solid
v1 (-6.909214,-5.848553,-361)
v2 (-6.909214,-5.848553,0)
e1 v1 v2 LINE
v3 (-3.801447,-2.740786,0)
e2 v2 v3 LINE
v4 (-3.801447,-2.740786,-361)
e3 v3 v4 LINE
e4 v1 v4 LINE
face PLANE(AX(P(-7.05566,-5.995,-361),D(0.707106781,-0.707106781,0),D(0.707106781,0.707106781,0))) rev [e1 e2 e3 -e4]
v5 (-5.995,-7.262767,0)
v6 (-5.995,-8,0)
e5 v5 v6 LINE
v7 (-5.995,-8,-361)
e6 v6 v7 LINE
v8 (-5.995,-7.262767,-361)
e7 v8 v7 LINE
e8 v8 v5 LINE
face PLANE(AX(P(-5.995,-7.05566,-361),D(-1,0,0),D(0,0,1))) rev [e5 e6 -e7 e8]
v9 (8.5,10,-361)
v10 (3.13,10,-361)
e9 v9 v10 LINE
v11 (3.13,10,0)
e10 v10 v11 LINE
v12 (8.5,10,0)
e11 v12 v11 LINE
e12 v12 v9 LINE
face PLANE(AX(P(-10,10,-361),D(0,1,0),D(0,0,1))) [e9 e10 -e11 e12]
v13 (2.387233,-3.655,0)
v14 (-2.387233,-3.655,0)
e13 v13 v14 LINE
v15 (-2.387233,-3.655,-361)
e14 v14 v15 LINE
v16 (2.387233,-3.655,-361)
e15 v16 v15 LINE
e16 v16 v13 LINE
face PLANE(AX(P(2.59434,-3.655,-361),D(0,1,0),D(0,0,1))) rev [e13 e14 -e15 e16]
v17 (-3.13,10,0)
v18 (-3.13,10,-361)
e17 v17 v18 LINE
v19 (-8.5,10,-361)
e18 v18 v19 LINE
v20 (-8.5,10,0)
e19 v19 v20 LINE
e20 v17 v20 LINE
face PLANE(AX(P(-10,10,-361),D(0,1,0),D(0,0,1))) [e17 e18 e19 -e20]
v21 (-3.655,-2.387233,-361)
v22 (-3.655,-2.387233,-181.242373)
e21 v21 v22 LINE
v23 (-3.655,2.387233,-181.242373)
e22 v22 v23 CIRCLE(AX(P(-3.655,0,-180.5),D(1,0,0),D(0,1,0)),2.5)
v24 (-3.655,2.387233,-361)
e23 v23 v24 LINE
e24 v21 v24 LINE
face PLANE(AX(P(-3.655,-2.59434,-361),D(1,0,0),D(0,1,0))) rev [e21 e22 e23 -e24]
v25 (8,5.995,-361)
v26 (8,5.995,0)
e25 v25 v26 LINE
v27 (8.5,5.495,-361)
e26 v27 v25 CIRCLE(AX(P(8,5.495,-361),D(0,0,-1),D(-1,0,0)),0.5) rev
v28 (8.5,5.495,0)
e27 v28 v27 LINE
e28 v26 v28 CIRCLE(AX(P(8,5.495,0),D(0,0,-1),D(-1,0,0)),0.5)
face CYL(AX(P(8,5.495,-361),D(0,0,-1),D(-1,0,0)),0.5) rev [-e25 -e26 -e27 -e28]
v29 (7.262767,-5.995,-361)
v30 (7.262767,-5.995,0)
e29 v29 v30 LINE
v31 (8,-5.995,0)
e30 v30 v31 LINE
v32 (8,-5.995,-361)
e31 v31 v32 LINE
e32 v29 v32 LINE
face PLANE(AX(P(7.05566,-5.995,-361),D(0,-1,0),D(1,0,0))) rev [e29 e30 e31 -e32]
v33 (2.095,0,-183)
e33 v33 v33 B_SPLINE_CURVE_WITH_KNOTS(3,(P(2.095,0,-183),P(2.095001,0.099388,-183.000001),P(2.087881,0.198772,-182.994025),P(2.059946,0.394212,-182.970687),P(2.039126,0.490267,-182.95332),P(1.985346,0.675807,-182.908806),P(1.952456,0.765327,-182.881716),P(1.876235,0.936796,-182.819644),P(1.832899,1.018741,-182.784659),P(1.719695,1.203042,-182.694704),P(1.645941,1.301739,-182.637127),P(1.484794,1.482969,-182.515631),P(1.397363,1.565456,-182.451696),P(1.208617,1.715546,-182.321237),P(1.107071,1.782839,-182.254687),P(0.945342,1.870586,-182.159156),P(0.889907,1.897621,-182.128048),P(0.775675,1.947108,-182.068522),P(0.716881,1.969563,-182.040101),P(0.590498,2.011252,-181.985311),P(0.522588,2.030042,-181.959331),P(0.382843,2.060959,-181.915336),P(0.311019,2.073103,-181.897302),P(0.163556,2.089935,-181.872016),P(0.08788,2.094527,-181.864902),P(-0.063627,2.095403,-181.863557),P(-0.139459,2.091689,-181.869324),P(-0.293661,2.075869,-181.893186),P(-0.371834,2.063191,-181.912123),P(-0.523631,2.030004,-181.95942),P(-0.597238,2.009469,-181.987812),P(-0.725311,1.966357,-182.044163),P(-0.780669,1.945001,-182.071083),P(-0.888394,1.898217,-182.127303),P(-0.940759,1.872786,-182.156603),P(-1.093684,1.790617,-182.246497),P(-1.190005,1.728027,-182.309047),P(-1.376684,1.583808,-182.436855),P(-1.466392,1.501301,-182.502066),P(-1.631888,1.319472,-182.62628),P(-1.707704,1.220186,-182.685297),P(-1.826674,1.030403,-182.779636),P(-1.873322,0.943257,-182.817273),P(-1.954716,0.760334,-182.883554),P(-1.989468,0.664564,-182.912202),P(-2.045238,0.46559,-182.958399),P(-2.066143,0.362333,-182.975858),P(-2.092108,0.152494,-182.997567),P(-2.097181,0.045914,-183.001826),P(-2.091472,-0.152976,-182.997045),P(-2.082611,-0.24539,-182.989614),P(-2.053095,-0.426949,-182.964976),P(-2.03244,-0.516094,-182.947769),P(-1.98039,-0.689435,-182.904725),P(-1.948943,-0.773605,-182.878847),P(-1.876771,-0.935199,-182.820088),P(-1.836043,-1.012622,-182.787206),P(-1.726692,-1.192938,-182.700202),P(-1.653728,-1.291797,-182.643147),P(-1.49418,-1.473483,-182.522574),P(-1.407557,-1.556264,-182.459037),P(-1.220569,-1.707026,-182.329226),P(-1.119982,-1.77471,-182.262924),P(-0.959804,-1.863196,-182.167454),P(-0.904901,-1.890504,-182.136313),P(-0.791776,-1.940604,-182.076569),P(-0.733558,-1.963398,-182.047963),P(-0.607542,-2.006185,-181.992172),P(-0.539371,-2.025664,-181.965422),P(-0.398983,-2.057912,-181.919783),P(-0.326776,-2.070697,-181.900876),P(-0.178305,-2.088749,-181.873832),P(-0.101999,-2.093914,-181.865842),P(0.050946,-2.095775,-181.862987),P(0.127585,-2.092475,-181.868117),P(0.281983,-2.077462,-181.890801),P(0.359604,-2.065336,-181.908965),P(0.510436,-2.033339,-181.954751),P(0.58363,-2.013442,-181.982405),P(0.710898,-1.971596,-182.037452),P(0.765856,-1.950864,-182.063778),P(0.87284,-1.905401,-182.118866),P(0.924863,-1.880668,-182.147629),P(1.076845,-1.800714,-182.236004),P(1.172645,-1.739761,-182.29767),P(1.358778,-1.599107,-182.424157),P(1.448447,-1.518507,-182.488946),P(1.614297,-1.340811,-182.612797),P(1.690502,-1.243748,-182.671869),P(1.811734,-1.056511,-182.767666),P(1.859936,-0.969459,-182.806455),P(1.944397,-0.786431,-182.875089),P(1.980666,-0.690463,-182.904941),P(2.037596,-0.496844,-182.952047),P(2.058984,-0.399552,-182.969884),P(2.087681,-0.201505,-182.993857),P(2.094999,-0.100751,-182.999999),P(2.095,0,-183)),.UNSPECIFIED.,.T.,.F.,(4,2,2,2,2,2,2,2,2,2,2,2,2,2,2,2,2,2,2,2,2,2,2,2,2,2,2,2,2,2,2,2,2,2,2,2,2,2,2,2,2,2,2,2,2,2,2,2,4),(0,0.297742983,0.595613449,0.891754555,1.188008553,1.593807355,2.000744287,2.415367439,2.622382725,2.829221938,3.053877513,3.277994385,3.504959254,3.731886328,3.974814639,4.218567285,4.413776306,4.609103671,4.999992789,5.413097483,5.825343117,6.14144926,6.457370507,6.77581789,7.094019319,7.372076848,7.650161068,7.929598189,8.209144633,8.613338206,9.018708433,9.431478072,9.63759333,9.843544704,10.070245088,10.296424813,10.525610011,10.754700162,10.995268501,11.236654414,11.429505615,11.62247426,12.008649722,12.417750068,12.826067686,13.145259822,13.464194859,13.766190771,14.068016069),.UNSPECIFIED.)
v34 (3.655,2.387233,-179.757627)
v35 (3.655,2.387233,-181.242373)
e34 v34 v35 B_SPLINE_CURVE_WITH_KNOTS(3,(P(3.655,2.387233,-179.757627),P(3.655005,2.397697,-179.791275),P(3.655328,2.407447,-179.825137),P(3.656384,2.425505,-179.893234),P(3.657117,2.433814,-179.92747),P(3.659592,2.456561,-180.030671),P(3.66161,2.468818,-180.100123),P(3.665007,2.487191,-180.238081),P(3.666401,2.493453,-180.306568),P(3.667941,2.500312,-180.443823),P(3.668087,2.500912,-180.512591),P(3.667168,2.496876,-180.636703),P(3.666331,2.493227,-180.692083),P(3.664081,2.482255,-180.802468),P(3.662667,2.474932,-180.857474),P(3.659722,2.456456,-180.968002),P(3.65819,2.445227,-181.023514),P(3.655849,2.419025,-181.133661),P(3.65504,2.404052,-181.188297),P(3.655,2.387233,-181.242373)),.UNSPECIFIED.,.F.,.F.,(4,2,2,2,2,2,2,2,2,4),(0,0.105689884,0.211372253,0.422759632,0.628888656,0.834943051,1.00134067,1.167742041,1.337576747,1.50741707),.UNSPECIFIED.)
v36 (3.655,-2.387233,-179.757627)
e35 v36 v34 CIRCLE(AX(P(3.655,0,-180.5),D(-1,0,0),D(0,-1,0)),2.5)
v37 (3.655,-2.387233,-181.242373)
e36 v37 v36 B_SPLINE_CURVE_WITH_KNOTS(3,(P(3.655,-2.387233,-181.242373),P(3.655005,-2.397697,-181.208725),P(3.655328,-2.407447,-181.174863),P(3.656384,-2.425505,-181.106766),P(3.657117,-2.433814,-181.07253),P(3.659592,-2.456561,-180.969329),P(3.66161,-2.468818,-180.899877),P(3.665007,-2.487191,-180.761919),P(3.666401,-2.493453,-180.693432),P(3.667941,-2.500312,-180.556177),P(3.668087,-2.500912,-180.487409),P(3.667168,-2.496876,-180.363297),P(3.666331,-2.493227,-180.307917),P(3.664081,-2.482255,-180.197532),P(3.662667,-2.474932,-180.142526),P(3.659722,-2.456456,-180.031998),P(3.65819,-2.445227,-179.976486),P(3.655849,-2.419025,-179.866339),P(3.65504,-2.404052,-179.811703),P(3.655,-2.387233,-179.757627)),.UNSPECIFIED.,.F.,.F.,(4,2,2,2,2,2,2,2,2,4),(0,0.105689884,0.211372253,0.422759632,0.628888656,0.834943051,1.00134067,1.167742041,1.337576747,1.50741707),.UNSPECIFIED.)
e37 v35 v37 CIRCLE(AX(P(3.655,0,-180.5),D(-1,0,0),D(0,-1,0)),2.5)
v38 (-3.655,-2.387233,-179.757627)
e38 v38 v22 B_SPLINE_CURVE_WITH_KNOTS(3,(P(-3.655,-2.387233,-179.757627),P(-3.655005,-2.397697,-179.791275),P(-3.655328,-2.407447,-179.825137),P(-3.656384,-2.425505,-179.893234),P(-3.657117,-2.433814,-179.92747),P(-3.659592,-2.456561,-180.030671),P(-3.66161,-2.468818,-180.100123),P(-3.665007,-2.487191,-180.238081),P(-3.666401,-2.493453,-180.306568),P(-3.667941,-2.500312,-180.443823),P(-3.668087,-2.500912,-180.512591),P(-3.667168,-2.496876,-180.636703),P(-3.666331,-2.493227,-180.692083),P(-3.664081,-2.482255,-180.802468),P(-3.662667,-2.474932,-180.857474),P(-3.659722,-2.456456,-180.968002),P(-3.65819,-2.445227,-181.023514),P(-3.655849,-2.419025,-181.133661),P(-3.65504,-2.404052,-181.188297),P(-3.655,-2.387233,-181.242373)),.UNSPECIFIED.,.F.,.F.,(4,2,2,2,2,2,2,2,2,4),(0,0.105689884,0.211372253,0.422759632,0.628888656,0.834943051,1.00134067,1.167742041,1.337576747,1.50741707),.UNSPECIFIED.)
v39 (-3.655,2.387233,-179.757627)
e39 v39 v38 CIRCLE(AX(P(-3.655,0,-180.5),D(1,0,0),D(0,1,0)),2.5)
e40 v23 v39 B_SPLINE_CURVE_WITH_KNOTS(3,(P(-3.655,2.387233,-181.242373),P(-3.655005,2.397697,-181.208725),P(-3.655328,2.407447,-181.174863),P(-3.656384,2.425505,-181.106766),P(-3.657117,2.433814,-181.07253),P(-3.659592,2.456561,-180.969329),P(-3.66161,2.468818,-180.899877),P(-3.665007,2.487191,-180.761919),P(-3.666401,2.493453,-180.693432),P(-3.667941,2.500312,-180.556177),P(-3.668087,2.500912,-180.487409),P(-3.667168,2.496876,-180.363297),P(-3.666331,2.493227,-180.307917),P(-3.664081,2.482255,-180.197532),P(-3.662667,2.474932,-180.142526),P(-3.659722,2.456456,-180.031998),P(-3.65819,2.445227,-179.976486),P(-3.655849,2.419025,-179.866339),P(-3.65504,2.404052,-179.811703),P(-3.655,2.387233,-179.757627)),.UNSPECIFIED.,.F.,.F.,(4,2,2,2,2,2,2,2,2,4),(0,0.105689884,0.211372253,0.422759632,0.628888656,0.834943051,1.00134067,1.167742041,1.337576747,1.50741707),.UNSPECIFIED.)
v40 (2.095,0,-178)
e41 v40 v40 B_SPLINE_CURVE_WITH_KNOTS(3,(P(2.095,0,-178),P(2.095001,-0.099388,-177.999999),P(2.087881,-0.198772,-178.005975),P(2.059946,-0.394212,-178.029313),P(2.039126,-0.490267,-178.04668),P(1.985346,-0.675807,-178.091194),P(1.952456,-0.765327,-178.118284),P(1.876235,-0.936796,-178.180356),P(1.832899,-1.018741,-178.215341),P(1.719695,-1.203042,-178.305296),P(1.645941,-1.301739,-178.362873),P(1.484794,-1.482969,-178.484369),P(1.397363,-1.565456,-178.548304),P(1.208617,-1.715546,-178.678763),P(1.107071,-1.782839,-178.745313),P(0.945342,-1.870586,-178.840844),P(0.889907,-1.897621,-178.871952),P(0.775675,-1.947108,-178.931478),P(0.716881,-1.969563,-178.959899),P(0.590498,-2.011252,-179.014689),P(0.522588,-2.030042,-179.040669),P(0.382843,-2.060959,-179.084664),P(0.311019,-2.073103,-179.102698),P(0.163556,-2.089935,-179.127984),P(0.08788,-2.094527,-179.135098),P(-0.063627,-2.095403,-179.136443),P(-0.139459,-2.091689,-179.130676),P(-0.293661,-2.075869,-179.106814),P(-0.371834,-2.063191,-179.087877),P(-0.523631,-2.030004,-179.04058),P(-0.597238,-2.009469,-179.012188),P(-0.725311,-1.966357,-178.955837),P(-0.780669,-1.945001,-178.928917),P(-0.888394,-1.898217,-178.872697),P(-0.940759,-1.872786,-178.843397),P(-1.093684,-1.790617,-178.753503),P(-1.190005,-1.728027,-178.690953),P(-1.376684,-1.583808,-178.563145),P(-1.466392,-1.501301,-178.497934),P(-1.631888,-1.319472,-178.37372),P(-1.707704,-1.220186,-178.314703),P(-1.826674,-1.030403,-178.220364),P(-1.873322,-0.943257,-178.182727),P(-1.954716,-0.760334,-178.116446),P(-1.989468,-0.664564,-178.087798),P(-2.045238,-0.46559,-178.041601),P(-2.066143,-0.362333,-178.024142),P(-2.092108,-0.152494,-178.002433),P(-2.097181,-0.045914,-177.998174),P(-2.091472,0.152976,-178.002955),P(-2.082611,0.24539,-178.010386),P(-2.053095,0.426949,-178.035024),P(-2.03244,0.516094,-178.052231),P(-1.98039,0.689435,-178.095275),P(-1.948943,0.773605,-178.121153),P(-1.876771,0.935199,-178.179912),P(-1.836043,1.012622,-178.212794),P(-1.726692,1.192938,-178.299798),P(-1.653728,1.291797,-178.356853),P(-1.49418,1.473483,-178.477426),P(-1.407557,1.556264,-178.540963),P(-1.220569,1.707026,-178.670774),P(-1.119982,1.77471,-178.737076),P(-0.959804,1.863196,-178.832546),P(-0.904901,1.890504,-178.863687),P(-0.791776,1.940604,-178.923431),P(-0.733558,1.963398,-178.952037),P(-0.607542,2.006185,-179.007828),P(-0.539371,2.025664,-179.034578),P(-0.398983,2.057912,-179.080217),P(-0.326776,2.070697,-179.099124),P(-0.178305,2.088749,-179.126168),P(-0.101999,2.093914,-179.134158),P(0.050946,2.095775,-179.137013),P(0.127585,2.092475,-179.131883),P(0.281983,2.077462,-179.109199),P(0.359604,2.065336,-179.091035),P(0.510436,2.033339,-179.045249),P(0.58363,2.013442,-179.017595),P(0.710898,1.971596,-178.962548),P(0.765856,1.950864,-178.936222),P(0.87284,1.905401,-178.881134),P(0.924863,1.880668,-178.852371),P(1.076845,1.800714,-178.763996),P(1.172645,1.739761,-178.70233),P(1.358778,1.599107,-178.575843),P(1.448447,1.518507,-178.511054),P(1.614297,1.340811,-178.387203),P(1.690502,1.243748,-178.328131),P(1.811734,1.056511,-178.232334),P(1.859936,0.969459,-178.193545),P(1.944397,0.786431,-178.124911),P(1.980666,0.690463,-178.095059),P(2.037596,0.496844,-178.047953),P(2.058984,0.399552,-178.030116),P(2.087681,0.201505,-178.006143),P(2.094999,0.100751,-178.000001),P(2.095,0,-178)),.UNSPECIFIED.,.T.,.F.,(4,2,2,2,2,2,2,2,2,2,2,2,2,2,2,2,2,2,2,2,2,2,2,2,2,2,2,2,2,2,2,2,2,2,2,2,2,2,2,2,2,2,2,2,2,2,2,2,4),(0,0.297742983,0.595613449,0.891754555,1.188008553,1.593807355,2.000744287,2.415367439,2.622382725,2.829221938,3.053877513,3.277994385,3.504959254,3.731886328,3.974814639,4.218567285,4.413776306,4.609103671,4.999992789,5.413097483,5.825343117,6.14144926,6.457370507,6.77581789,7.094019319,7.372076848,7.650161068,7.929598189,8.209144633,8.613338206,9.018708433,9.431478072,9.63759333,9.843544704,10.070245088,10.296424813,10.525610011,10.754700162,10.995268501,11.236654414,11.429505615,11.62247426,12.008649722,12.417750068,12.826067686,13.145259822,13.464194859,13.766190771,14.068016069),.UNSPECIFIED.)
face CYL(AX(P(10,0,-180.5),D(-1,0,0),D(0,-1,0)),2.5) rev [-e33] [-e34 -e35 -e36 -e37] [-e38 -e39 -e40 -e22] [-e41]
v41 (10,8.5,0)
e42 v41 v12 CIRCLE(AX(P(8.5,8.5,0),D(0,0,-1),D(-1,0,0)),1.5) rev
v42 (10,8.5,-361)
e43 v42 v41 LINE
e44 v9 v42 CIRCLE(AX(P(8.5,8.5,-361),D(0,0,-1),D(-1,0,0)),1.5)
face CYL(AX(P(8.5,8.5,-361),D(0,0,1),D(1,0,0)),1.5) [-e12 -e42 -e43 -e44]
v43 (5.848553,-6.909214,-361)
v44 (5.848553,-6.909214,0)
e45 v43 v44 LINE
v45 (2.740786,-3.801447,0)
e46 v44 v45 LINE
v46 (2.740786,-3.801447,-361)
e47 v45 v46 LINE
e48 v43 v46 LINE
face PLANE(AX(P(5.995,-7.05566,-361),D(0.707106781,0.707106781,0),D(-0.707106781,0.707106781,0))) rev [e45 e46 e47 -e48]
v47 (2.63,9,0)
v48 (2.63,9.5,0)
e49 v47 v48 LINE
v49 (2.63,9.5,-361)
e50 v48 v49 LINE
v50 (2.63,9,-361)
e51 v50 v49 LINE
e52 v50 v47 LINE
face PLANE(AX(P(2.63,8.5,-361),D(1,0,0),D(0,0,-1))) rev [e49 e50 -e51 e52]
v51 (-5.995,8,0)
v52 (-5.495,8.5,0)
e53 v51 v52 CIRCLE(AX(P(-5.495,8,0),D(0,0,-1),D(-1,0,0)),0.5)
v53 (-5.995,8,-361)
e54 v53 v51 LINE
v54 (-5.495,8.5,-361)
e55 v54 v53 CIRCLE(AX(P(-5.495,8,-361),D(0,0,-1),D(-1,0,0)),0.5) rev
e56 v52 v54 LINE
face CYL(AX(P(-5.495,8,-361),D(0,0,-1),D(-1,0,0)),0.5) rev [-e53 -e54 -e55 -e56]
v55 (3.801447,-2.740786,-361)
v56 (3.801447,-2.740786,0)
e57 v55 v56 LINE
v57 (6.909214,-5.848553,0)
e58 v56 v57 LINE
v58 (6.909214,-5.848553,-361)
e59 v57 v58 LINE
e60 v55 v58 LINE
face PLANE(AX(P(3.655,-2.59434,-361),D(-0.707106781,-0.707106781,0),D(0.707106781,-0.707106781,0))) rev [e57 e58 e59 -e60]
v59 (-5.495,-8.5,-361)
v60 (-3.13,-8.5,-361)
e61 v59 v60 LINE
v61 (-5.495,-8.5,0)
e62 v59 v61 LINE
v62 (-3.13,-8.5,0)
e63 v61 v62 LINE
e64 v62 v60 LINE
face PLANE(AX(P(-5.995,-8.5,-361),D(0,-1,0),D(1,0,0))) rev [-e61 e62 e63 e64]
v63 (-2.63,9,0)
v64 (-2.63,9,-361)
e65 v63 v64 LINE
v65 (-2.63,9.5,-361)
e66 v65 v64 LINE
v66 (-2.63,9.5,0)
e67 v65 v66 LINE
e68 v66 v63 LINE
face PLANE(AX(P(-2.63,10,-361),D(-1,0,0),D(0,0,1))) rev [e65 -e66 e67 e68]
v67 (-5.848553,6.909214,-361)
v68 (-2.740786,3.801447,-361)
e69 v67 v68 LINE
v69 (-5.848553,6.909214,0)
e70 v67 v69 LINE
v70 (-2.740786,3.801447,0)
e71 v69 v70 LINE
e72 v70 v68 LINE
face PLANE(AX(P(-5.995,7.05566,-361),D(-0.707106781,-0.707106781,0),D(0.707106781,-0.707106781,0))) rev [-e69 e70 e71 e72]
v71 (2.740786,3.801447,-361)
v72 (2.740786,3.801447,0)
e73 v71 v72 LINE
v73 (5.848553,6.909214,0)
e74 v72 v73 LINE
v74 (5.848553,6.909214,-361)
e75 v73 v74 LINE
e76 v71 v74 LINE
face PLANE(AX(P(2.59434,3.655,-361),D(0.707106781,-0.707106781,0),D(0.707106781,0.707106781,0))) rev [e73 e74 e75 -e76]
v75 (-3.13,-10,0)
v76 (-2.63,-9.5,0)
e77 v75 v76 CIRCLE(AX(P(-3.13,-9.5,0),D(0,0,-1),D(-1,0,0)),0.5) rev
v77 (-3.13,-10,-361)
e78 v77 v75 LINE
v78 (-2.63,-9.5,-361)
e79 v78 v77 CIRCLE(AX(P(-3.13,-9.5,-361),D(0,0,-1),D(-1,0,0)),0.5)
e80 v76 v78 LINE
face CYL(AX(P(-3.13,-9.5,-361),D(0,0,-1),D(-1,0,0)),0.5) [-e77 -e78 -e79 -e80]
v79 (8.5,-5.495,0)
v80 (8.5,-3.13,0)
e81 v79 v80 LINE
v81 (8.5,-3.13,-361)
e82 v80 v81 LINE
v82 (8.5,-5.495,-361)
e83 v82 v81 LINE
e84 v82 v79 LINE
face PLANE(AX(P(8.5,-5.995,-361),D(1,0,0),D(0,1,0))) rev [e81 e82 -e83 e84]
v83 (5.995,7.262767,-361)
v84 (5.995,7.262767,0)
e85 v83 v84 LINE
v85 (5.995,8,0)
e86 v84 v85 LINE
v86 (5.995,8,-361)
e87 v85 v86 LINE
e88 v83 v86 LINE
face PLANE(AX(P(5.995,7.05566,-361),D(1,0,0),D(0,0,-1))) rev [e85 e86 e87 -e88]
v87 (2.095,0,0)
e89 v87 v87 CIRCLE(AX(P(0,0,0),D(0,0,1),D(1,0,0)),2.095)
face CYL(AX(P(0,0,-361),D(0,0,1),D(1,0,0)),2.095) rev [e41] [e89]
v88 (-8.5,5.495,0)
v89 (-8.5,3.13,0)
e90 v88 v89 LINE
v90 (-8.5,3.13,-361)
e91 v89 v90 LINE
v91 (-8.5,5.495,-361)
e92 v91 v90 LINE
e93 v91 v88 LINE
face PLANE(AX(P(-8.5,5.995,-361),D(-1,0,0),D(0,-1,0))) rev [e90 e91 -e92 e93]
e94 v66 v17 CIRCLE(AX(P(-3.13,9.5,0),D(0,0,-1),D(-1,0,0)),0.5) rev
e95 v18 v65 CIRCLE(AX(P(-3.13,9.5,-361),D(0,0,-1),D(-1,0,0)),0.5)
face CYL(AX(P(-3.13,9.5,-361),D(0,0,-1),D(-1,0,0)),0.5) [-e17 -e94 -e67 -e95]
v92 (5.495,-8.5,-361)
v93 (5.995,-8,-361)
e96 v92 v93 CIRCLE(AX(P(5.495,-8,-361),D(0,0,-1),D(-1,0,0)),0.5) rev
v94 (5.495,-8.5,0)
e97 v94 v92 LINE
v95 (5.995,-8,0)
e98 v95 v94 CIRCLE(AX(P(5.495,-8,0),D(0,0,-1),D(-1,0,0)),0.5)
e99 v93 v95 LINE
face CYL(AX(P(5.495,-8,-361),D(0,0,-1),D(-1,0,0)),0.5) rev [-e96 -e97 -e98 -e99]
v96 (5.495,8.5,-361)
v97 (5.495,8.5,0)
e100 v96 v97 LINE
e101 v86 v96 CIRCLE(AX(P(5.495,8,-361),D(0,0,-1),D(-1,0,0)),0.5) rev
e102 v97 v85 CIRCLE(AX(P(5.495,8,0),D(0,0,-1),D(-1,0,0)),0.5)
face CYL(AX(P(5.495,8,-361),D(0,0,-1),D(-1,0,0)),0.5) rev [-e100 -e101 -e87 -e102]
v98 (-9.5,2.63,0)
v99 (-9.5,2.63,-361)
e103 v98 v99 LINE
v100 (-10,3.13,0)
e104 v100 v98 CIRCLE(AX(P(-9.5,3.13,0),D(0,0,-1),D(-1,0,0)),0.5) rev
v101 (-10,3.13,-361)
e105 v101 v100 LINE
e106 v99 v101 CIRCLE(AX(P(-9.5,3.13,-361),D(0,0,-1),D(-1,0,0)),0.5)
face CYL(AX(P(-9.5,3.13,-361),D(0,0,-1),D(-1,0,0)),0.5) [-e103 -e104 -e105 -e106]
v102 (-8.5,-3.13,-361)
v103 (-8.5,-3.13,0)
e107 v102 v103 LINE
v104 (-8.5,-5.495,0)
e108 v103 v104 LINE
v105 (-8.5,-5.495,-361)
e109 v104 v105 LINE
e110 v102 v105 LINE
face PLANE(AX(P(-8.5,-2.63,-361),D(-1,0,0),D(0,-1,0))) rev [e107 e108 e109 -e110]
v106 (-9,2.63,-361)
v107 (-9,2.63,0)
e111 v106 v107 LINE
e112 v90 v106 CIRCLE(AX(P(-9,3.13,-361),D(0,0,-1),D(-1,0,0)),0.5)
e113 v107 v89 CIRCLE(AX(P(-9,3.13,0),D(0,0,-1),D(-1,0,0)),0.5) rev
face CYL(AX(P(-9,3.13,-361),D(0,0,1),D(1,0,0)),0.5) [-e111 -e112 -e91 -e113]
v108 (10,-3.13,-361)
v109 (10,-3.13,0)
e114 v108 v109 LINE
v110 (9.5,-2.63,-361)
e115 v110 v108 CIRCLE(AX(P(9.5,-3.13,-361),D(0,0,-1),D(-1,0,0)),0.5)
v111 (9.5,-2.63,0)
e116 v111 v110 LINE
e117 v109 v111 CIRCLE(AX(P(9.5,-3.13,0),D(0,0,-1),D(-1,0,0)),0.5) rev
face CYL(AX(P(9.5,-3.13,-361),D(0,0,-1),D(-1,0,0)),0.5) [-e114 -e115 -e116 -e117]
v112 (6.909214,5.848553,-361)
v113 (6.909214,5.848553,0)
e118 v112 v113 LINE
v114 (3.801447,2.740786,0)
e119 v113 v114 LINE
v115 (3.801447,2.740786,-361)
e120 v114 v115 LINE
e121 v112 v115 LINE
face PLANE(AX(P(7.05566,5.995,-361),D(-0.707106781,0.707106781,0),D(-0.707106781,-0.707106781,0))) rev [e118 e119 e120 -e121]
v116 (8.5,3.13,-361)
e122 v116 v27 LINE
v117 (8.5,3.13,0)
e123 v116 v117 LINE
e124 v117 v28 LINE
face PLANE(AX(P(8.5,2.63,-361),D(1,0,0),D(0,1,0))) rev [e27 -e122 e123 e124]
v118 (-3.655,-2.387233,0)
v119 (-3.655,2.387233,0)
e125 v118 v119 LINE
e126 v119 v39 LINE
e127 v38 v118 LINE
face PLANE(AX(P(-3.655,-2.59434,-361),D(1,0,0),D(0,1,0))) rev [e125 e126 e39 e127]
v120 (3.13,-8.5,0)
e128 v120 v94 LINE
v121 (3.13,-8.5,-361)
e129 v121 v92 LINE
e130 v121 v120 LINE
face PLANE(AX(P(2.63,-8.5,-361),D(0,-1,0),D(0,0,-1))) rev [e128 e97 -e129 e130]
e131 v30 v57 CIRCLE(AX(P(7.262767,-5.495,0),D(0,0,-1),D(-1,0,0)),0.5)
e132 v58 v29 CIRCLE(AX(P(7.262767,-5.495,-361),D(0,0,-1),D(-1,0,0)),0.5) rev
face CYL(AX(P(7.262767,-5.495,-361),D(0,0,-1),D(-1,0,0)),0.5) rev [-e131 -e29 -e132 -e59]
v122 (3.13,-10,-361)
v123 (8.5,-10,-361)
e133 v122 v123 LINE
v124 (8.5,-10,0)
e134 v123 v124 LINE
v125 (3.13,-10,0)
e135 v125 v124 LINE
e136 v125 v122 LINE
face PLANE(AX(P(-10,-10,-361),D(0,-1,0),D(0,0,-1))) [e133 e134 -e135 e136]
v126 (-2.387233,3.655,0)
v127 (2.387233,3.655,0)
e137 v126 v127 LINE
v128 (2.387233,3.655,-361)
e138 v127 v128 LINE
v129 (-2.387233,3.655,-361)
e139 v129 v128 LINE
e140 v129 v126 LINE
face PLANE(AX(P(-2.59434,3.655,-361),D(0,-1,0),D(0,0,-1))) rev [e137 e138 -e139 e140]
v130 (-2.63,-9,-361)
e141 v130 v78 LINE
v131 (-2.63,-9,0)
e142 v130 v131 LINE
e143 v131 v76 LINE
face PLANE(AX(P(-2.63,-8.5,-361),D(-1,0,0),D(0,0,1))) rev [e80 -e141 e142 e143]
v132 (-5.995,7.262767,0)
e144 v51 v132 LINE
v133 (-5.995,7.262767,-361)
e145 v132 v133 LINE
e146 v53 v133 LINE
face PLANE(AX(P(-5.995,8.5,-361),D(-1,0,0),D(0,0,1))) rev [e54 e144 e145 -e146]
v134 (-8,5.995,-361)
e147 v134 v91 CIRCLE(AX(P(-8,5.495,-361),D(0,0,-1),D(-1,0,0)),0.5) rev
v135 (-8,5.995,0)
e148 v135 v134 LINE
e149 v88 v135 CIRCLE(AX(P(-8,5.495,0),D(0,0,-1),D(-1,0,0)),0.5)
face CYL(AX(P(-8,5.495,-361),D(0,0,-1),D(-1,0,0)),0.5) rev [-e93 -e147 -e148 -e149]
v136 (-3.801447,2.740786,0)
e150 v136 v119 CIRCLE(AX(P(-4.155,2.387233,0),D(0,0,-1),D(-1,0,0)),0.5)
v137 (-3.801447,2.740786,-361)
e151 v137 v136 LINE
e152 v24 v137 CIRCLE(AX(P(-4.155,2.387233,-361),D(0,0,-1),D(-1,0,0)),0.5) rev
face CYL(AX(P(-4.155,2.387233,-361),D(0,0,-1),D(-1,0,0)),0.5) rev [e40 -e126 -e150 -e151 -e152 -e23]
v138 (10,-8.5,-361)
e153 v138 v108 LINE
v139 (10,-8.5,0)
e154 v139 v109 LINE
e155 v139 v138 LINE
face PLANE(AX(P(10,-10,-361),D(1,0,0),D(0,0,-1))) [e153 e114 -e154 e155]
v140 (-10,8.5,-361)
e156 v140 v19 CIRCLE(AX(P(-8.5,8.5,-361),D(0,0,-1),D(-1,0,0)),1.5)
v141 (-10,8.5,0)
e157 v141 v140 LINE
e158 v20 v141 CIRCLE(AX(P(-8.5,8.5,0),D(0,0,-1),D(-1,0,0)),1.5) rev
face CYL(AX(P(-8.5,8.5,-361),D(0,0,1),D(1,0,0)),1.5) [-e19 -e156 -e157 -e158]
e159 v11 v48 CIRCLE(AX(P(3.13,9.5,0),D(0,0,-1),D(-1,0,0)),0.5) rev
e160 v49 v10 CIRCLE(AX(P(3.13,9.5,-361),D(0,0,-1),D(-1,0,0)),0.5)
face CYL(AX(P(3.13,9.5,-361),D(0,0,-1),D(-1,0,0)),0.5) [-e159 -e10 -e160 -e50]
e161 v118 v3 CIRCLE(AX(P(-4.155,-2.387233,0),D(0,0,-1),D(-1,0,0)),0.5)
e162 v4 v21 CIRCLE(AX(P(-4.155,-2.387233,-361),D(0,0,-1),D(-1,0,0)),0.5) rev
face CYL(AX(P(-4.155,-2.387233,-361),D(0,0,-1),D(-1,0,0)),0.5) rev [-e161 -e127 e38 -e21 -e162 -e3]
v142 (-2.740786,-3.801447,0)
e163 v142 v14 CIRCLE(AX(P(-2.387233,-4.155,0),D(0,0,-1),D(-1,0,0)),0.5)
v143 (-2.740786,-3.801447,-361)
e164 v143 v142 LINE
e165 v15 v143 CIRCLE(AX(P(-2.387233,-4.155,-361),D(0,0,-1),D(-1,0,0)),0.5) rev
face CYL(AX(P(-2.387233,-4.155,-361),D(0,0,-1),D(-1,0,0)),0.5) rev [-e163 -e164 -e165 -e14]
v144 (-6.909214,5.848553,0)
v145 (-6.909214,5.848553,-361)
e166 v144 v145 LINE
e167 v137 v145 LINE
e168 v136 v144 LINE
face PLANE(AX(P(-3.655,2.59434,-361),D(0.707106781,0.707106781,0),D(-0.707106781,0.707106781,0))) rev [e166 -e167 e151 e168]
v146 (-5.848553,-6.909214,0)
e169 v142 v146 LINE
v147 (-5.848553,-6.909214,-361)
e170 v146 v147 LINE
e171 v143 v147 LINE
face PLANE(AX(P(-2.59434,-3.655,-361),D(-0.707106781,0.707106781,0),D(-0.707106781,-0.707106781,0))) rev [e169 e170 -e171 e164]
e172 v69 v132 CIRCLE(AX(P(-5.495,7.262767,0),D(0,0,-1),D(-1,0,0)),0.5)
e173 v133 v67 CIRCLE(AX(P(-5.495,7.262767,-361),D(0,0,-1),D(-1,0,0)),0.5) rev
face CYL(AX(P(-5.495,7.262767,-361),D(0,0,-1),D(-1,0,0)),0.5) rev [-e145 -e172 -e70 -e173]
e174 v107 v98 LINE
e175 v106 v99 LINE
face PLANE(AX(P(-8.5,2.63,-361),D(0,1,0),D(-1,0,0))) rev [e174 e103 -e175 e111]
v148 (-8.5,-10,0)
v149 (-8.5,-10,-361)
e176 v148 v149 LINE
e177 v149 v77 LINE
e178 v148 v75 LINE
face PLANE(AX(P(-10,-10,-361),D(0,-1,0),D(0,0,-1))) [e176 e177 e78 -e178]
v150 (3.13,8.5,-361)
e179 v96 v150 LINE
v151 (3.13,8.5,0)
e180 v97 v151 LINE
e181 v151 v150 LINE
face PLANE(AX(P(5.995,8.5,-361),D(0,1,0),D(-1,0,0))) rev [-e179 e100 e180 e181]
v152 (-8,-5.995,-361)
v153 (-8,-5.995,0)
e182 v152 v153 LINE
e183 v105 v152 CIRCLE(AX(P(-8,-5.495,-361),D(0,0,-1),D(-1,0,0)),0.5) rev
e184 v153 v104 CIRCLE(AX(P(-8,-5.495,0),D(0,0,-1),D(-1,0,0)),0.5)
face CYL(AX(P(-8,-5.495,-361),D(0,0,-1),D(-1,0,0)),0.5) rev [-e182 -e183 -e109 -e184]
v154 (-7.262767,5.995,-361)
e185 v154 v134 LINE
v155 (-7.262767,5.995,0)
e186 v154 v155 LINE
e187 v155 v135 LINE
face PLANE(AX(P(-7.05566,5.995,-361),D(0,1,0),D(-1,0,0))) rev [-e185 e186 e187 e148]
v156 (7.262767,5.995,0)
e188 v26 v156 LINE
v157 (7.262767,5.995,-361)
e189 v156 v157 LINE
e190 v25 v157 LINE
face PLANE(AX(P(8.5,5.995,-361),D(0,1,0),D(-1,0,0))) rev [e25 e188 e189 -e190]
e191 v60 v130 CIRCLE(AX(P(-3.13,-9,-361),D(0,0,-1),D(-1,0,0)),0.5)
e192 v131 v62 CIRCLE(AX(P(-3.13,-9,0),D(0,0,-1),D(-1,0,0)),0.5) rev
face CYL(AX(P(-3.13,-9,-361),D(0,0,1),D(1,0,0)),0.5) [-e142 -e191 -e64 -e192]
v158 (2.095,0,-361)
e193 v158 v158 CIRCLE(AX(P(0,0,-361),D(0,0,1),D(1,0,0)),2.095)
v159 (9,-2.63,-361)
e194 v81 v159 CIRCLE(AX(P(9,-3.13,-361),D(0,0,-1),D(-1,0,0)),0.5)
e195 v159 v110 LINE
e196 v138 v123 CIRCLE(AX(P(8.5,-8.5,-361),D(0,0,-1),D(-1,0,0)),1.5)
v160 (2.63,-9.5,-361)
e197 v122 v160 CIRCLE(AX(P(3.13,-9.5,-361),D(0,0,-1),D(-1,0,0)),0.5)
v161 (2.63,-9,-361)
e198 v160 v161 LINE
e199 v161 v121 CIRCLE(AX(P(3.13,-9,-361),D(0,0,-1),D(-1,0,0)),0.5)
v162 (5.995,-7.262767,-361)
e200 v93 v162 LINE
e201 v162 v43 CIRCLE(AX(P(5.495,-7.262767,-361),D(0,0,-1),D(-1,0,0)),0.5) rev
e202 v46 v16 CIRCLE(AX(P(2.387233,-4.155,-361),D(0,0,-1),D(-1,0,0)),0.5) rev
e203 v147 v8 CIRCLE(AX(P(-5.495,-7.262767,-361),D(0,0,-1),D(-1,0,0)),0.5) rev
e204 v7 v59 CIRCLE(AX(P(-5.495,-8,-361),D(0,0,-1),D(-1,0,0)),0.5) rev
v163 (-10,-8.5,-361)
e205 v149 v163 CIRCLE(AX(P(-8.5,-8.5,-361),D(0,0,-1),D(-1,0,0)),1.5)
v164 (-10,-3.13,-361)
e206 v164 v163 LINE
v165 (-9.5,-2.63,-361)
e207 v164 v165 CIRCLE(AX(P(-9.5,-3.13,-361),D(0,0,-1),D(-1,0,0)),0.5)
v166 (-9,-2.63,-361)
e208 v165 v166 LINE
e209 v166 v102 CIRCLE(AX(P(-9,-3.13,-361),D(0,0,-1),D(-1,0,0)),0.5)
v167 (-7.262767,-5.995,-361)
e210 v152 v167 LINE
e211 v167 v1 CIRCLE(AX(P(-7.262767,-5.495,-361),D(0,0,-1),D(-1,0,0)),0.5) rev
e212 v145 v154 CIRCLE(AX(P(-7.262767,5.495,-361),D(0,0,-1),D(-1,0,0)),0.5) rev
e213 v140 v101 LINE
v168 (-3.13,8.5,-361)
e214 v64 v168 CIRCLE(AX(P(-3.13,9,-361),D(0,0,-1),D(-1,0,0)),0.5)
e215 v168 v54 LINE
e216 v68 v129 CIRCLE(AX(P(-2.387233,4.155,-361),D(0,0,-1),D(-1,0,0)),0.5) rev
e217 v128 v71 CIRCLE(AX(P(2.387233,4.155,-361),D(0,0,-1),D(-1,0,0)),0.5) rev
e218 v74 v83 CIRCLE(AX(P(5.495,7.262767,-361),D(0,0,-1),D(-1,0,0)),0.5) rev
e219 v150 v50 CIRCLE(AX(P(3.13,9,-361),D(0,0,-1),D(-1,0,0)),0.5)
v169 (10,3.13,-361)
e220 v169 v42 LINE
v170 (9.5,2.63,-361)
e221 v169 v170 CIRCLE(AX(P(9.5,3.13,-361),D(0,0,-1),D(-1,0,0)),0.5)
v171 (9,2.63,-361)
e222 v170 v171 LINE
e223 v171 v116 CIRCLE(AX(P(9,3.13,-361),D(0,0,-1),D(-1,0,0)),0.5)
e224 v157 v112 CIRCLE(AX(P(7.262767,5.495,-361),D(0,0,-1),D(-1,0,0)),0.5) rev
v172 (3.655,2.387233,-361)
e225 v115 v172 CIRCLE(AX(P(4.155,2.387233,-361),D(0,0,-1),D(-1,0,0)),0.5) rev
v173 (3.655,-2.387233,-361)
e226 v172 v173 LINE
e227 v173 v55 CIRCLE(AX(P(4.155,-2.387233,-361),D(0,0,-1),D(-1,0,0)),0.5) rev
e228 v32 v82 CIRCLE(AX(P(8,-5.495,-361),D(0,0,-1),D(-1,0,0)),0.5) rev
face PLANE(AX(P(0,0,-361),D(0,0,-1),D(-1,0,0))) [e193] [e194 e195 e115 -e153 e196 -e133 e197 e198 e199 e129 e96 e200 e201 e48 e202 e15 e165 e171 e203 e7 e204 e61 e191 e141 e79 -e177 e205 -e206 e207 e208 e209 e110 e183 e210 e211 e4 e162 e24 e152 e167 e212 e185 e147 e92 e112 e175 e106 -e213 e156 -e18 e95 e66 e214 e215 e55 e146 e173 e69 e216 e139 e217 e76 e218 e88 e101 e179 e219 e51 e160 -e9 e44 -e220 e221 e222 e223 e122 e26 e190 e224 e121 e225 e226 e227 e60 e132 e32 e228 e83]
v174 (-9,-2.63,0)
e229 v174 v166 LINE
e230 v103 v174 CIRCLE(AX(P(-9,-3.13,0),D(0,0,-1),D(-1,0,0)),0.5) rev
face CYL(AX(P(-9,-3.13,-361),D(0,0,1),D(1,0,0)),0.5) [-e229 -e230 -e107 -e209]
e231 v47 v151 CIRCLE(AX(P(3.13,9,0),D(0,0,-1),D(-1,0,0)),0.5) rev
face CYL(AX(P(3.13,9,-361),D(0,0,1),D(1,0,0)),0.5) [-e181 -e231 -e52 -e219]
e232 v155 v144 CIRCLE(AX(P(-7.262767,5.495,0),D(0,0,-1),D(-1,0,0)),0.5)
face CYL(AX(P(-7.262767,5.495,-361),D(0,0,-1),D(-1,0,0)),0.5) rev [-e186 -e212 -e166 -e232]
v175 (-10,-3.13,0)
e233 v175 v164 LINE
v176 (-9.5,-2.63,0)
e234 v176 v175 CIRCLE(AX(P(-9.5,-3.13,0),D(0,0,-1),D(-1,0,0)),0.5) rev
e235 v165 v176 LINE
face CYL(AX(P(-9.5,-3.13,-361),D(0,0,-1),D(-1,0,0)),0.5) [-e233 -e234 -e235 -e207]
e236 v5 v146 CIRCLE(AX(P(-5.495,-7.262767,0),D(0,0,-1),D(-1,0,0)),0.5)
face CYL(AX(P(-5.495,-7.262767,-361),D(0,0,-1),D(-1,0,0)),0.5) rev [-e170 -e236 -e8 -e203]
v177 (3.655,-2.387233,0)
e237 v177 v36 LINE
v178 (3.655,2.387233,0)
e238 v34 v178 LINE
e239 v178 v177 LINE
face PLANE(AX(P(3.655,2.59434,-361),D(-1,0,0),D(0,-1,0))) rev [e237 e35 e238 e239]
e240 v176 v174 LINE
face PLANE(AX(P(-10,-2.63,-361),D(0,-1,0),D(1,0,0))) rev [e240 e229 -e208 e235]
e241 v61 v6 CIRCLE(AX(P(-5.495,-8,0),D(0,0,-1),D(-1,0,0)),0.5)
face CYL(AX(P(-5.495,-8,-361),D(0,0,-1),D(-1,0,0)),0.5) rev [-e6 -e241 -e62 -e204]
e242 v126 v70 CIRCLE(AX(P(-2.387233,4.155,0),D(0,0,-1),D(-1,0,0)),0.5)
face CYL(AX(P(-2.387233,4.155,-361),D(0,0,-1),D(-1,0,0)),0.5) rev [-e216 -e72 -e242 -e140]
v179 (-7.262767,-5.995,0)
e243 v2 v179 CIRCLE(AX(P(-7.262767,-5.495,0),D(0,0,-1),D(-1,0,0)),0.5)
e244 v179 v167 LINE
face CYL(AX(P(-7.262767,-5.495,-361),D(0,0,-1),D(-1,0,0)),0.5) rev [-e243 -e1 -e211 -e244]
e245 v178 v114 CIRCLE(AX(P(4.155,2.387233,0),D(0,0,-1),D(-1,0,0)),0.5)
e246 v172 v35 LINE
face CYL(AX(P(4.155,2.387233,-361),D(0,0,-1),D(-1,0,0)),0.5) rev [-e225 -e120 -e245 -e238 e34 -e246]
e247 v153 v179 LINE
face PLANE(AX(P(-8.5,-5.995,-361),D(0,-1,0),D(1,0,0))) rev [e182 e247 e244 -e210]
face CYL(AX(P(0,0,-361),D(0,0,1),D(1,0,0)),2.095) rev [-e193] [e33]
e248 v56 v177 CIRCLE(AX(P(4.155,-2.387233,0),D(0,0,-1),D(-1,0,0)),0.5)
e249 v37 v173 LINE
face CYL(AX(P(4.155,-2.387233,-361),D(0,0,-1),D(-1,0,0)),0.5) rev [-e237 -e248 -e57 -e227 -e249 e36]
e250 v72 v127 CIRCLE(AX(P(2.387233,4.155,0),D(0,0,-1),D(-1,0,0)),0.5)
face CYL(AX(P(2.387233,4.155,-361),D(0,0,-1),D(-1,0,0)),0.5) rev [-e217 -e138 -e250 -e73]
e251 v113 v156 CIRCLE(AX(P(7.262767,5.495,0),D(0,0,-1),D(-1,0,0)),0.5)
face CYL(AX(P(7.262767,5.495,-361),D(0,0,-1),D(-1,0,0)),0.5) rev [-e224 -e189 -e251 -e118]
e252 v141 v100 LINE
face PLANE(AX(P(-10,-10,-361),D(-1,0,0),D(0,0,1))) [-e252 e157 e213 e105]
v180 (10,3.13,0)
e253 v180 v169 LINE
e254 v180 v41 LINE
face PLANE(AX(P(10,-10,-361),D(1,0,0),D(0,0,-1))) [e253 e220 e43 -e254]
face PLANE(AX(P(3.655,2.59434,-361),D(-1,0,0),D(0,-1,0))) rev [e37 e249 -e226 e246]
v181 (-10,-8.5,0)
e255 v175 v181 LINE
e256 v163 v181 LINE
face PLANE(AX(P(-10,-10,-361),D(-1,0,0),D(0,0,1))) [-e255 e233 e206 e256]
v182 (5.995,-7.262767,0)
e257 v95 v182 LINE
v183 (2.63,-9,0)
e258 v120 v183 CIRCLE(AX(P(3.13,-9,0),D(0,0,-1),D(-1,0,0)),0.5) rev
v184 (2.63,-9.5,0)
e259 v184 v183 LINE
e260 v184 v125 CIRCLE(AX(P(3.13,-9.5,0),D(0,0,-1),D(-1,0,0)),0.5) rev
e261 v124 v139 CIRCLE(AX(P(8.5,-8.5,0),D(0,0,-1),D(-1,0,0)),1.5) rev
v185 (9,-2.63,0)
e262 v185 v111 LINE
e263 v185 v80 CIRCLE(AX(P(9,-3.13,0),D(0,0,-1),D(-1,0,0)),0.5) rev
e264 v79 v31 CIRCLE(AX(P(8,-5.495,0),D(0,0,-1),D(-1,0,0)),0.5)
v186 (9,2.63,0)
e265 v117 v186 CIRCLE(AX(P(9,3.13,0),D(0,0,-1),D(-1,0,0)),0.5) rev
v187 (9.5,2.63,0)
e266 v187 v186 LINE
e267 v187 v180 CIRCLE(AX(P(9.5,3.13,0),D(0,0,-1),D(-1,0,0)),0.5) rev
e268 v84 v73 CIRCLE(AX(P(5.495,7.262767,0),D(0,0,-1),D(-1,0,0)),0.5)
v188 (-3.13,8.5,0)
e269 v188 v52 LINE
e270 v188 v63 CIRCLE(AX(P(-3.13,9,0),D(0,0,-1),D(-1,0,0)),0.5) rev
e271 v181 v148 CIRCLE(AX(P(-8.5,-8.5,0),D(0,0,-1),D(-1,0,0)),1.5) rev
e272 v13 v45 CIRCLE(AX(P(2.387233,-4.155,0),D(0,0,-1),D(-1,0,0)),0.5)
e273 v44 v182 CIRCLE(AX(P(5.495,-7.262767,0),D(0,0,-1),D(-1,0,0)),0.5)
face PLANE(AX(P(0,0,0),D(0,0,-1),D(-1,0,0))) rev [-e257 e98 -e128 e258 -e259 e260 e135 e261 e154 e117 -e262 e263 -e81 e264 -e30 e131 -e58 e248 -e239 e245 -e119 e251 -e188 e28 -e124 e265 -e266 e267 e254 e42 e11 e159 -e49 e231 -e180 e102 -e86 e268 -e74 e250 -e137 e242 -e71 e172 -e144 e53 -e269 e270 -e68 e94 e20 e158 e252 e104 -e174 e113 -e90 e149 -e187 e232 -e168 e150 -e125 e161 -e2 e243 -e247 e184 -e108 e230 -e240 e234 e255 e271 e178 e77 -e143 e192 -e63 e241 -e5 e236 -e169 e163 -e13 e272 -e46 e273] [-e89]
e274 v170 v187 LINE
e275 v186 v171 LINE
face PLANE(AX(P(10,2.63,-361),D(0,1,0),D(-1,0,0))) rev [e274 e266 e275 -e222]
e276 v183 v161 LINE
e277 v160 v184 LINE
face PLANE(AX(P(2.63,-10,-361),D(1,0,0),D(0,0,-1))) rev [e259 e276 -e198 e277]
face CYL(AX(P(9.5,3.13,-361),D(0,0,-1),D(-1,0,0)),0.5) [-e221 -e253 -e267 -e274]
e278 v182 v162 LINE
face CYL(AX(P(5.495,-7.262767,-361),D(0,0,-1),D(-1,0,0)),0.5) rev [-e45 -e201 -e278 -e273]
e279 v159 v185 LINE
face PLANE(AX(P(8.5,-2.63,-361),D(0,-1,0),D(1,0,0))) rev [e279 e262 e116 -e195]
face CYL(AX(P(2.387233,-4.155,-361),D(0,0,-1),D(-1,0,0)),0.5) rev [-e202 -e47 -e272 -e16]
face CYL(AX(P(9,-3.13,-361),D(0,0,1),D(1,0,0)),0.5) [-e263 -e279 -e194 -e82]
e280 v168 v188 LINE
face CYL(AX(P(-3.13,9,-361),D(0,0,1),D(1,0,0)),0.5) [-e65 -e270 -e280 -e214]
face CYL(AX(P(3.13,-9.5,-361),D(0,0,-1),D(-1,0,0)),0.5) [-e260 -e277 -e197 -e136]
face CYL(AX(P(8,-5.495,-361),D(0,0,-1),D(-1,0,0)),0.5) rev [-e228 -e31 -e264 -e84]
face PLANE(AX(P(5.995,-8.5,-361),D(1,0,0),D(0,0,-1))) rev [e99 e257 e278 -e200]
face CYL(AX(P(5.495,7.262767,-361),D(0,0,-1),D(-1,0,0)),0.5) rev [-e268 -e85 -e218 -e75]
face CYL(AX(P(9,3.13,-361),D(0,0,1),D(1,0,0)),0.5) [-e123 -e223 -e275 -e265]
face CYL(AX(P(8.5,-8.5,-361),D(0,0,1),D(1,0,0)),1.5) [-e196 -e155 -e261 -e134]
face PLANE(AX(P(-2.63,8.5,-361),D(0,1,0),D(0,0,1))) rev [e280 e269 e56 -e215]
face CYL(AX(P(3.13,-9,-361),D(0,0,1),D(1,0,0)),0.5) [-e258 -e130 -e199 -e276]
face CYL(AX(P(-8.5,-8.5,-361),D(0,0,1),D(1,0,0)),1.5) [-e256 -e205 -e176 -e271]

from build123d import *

# Parameters (mm, degrees)
SKETCH1_W               = 20
SKETCH1_H               = 20
BOSS_EXTRUDE1_DEPTH     = 361
CUT_EXTRUDE1_DEPTH      = 362.276902112
FILLET1_R               = 0.5
CIRPATTERN1_START       = -361
CIRPATTERN1_DEPTH       = 361
FILLET2_R               = 1.5
SKETCH3_R               = 2.095
CUT_EXTRUDE2_DEPTH      = 362.276902112
FILLET3_R               = 0.5
CUT_EXTRUDE3_DEPTH      = 362.396539863
CUT_EXTRUDE3_DEPTH_BACK = 362.396539863
SKETCH4_R               = 2.5


# Read off the part's stored shape, not the designer's step: CirPattern1
with BuildPart() as part:
    # Sketch1 → Boss-Extrude1 (new body)
    with BuildSketch(Plane.XY):
        Rectangle(SKETCH1_W, SKETCH1_H)
    extrude(amount=-BOSS_EXTRUDE1_DEPTH)

    # Sketch2 → Cut-Extrude1 (cut, through all)
    with BuildSketch(Plane.XY):
        Polygon((0, 10), (-2.63, 10), (-2.63, 8.5), (-5.995, 8.5), (-5.995, 7.055660172), (-2.594339828, 3.655), (2.594339828, 3.655), (5.995, 7.055660172), (5.995, 8.5), (2.63, 8.5), (2.63, 10), align=None)
    extrude(amount=-CUT_EXTRUDE1_DEPTH, mode=Mode.SUBTRACT)

    # Fillet1
    fillet1_edges = [part.edges().sort_by_distance(p)[0] for p in [
        (2.63, 10, -180.5),
        (2.63, 8.5, -180.5),
        (5.995, 8.5, -180.5),
        (5.995, 7.055660172, -180.5),
        (2.594339828, 3.655, -180.5),
        (-2.594339828, 3.655, -180.5),
        (-5.995, 7.055660172, -180.5),
        (-5.995, 8.5, -180.5),
        (-2.63, 8.5, -180.5),
        (-2.63, 10, -180.5),
    ]]
    fillet(fillet1_edges, radius=FILLET1_R)

    # CirPattern1 outline → CirPattern1 (cut)
    with BuildSketch(Plane.XY.offset(CIRPATTERN1_START)):
        with BuildLine():
            Line((-2.63, -10), (2.63, -10))
            Line((2.63, -10), (2.63, -9))
            ThreePointArc((2.63, -9), (2.776446609, -8.646446609), (3.13, -8.5))
            Line((3.13, -8.5), (5.495, -8.5))
            ThreePointArc((5.495, -8.5), (5.848553391, -8.353553391), (5.995, -8))
            Line((5.995, -8), (5.995, -7.262766953))
            ThreePointArc((5.995, -7.262766953), (5.956939766, -7.071425237), (5.848553391, -6.909213562))
            Line((5.848553391, -6.909213562), (2.740786438, -3.801446609))
            ThreePointArc((2.740786438, -3.801446609), (2.578574763, -3.693060234), (2.387233047, -3.655))
            Line((2.387233047, -3.655), (-2.387233047, -3.655))
            ThreePointArc((-2.387233047, -3.655), (-2.578574763, -3.693060234), (-2.740786438, -3.801446609))
            Line((-2.740786438, -3.801446609), (-5.848553391, -6.909213562))
            ThreePointArc((-5.848553391, -6.909213562), (-5.956939766, -7.071425237), (-5.995, -7.262766953))
            Line((-5.995, -7.262766953), (-5.995, -8))
            ThreePointArc((-5.995, -8), (-5.848553391, -8.353553391), (-5.495, -8.5))
            Line((-5.495, -8.5), (-3.13, -8.5))
            ThreePointArc((-3.13, -8.5), (-2.776446609, -8.646446609), (-2.63, -9))
            Line((-2.63, -9), (-2.63, -10))
        make_face()
        with BuildLine():
            Line((-10, 2.63), (-10, -2.63))
            Line((-10, -2.63), (-9, -2.63))
            ThreePointArc((-9, -2.63), (-8.646446609, -2.776446609), (-8.5, -3.13))
            Line((-8.5, -3.13), (-8.5, -5.495))
            ThreePointArc((-8.5, -5.495), (-8.353553391, -5.848553391), (-8, -5.995))
            Line((-8, -5.995), (-7.262766953, -5.995))
            ThreePointArc((-7.262766953, -5.995), (-7.071425237, -5.956939766), (-6.909213562, -5.848553391))
            Line((-6.909213562, -5.848553391), (-3.801446609, -2.740786438))
            ThreePointArc((-3.801446609, -2.740786438), (-3.693060234, -2.578574763), (-3.655, -2.387233047))
            Line((-3.655, -2.387233047), (-3.655, 2.387233047))
            ThreePointArc((-3.655, 2.387233047), (-3.693060234, 2.578574763), (-3.801446609, 2.740786438))
            Line((-3.801446609, 2.740786438), (-6.909213562, 5.848553391))
            ThreePointArc((-6.909213562, 5.848553391), (-7.071425237, 5.956939766), (-7.262766953, 5.995))
            Line((-7.262766953, 5.995), (-8, 5.995))
            ThreePointArc((-8, 5.995), (-8.353553391, 5.848553391), (-8.5, 5.495))
            Line((-8.5, 5.495), (-8.5, 3.13))
            ThreePointArc((-8.5, 3.13), (-8.646446609, 2.776446609), (-9, 2.63))
            Line((-9, 2.63), (-10, 2.63))
        make_face()
        with BuildLine():
            Line((9, -2.63), (10, -2.63))
            Line((10, -2.63), (10, 2.63))
            Line((10, 2.63), (9, 2.63))
            ThreePointArc((9, 2.63), (8.646446609, 2.776446609), (8.5, 3.13))
            Line((8.5, 3.13), (8.5, 5.495))
            ThreePointArc((8.5, 5.495), (8.353553391, 5.848553391), (8, 5.995))
            Line((8, 5.995), (7.262766953, 5.995))
            ThreePointArc((7.262766953, 5.995), (7.071425237, 5.956939766), (6.909213562, 5.848553391))
            Line((6.909213562, 5.848553391), (3.801446609, 2.740786438))
            ThreePointArc((3.801446609, 2.740786438), (3.693060234, 2.578574763), (3.655, 2.387233047))
            Line((3.655, 2.387233047), (3.655, -2.387233047))
            ThreePointArc((3.655, -2.387233047), (3.693060234, -2.578574763), (3.801446609, -2.740786438))
            Line((3.801446609, -2.740786438), (6.909213562, -5.848553391))
            ThreePointArc((6.909213562, -5.848553391), (7.071425237, -5.956939766), (7.262766953, -5.995))
            Line((7.262766953, -5.995), (8, -5.995))
            ThreePointArc((8, -5.995), (8.353553391, -5.848553391), (8.5, -5.495))
            Line((8.5, -5.495), (8.5, -3.13))
            ThreePointArc((8.5, -3.13), (8.646446609, -2.776446609), (9, -2.63))
        make_face()
    extrude(amount=CIRPATTERN1_DEPTH, mode=Mode.SUBTRACT)

    # Fillet2
    fillet2_edges = [part.edges().sort_by_distance(p)[0] for p in [
        (10, -10, -180.5),
        (-10, -10, -180.5),
        (-10, 10, -180.5),
        (10, 10, -180.5),
    ]]
    fillet(fillet2_edges, radius=FILLET2_R)

    # Sketch3 → Cut-Extrude2 (cut, through all)
    with BuildSketch(Plane.XY):
        Circle(SKETCH3_R)
    extrude(amount=-CUT_EXTRUDE2_DEPTH, mode=Mode.SUBTRACT)

    # Fillet3
    fillet3_edges = [part.edges().sort_by_distance(p)[0] for p in [
        (-10, 2.63, -180.5),
        (-10, -2.63, -180.5),
        (-2.63, -10, -180.5),
        (2.63, -10, -180.5),
        (10, -2.63, -180.5),
        (10, 2.63, -180.5),
    ]]
    fillet(fillet3_edges, radius=FILLET3_R)

    # Sketch4 → Cut-Extrude3 (cut, two sides: drawn at the far end of the back side and taken through both)
    with BuildSketch(Plane.ZY.offset(3.655).offset(-CUT_EXTRUDE3_DEPTH_BACK)):
        with Locations(Location((-180.5, 0, 0), (0, 0, 287.274468256))):
            Circle(SKETCH4_R)
    extrude(amount=CUT_EXTRUDE3_DEPTH + CUT_EXTRUDE3_DEPTH_BACK, mode=Mode.SUBTRACT)


solid = part.part
